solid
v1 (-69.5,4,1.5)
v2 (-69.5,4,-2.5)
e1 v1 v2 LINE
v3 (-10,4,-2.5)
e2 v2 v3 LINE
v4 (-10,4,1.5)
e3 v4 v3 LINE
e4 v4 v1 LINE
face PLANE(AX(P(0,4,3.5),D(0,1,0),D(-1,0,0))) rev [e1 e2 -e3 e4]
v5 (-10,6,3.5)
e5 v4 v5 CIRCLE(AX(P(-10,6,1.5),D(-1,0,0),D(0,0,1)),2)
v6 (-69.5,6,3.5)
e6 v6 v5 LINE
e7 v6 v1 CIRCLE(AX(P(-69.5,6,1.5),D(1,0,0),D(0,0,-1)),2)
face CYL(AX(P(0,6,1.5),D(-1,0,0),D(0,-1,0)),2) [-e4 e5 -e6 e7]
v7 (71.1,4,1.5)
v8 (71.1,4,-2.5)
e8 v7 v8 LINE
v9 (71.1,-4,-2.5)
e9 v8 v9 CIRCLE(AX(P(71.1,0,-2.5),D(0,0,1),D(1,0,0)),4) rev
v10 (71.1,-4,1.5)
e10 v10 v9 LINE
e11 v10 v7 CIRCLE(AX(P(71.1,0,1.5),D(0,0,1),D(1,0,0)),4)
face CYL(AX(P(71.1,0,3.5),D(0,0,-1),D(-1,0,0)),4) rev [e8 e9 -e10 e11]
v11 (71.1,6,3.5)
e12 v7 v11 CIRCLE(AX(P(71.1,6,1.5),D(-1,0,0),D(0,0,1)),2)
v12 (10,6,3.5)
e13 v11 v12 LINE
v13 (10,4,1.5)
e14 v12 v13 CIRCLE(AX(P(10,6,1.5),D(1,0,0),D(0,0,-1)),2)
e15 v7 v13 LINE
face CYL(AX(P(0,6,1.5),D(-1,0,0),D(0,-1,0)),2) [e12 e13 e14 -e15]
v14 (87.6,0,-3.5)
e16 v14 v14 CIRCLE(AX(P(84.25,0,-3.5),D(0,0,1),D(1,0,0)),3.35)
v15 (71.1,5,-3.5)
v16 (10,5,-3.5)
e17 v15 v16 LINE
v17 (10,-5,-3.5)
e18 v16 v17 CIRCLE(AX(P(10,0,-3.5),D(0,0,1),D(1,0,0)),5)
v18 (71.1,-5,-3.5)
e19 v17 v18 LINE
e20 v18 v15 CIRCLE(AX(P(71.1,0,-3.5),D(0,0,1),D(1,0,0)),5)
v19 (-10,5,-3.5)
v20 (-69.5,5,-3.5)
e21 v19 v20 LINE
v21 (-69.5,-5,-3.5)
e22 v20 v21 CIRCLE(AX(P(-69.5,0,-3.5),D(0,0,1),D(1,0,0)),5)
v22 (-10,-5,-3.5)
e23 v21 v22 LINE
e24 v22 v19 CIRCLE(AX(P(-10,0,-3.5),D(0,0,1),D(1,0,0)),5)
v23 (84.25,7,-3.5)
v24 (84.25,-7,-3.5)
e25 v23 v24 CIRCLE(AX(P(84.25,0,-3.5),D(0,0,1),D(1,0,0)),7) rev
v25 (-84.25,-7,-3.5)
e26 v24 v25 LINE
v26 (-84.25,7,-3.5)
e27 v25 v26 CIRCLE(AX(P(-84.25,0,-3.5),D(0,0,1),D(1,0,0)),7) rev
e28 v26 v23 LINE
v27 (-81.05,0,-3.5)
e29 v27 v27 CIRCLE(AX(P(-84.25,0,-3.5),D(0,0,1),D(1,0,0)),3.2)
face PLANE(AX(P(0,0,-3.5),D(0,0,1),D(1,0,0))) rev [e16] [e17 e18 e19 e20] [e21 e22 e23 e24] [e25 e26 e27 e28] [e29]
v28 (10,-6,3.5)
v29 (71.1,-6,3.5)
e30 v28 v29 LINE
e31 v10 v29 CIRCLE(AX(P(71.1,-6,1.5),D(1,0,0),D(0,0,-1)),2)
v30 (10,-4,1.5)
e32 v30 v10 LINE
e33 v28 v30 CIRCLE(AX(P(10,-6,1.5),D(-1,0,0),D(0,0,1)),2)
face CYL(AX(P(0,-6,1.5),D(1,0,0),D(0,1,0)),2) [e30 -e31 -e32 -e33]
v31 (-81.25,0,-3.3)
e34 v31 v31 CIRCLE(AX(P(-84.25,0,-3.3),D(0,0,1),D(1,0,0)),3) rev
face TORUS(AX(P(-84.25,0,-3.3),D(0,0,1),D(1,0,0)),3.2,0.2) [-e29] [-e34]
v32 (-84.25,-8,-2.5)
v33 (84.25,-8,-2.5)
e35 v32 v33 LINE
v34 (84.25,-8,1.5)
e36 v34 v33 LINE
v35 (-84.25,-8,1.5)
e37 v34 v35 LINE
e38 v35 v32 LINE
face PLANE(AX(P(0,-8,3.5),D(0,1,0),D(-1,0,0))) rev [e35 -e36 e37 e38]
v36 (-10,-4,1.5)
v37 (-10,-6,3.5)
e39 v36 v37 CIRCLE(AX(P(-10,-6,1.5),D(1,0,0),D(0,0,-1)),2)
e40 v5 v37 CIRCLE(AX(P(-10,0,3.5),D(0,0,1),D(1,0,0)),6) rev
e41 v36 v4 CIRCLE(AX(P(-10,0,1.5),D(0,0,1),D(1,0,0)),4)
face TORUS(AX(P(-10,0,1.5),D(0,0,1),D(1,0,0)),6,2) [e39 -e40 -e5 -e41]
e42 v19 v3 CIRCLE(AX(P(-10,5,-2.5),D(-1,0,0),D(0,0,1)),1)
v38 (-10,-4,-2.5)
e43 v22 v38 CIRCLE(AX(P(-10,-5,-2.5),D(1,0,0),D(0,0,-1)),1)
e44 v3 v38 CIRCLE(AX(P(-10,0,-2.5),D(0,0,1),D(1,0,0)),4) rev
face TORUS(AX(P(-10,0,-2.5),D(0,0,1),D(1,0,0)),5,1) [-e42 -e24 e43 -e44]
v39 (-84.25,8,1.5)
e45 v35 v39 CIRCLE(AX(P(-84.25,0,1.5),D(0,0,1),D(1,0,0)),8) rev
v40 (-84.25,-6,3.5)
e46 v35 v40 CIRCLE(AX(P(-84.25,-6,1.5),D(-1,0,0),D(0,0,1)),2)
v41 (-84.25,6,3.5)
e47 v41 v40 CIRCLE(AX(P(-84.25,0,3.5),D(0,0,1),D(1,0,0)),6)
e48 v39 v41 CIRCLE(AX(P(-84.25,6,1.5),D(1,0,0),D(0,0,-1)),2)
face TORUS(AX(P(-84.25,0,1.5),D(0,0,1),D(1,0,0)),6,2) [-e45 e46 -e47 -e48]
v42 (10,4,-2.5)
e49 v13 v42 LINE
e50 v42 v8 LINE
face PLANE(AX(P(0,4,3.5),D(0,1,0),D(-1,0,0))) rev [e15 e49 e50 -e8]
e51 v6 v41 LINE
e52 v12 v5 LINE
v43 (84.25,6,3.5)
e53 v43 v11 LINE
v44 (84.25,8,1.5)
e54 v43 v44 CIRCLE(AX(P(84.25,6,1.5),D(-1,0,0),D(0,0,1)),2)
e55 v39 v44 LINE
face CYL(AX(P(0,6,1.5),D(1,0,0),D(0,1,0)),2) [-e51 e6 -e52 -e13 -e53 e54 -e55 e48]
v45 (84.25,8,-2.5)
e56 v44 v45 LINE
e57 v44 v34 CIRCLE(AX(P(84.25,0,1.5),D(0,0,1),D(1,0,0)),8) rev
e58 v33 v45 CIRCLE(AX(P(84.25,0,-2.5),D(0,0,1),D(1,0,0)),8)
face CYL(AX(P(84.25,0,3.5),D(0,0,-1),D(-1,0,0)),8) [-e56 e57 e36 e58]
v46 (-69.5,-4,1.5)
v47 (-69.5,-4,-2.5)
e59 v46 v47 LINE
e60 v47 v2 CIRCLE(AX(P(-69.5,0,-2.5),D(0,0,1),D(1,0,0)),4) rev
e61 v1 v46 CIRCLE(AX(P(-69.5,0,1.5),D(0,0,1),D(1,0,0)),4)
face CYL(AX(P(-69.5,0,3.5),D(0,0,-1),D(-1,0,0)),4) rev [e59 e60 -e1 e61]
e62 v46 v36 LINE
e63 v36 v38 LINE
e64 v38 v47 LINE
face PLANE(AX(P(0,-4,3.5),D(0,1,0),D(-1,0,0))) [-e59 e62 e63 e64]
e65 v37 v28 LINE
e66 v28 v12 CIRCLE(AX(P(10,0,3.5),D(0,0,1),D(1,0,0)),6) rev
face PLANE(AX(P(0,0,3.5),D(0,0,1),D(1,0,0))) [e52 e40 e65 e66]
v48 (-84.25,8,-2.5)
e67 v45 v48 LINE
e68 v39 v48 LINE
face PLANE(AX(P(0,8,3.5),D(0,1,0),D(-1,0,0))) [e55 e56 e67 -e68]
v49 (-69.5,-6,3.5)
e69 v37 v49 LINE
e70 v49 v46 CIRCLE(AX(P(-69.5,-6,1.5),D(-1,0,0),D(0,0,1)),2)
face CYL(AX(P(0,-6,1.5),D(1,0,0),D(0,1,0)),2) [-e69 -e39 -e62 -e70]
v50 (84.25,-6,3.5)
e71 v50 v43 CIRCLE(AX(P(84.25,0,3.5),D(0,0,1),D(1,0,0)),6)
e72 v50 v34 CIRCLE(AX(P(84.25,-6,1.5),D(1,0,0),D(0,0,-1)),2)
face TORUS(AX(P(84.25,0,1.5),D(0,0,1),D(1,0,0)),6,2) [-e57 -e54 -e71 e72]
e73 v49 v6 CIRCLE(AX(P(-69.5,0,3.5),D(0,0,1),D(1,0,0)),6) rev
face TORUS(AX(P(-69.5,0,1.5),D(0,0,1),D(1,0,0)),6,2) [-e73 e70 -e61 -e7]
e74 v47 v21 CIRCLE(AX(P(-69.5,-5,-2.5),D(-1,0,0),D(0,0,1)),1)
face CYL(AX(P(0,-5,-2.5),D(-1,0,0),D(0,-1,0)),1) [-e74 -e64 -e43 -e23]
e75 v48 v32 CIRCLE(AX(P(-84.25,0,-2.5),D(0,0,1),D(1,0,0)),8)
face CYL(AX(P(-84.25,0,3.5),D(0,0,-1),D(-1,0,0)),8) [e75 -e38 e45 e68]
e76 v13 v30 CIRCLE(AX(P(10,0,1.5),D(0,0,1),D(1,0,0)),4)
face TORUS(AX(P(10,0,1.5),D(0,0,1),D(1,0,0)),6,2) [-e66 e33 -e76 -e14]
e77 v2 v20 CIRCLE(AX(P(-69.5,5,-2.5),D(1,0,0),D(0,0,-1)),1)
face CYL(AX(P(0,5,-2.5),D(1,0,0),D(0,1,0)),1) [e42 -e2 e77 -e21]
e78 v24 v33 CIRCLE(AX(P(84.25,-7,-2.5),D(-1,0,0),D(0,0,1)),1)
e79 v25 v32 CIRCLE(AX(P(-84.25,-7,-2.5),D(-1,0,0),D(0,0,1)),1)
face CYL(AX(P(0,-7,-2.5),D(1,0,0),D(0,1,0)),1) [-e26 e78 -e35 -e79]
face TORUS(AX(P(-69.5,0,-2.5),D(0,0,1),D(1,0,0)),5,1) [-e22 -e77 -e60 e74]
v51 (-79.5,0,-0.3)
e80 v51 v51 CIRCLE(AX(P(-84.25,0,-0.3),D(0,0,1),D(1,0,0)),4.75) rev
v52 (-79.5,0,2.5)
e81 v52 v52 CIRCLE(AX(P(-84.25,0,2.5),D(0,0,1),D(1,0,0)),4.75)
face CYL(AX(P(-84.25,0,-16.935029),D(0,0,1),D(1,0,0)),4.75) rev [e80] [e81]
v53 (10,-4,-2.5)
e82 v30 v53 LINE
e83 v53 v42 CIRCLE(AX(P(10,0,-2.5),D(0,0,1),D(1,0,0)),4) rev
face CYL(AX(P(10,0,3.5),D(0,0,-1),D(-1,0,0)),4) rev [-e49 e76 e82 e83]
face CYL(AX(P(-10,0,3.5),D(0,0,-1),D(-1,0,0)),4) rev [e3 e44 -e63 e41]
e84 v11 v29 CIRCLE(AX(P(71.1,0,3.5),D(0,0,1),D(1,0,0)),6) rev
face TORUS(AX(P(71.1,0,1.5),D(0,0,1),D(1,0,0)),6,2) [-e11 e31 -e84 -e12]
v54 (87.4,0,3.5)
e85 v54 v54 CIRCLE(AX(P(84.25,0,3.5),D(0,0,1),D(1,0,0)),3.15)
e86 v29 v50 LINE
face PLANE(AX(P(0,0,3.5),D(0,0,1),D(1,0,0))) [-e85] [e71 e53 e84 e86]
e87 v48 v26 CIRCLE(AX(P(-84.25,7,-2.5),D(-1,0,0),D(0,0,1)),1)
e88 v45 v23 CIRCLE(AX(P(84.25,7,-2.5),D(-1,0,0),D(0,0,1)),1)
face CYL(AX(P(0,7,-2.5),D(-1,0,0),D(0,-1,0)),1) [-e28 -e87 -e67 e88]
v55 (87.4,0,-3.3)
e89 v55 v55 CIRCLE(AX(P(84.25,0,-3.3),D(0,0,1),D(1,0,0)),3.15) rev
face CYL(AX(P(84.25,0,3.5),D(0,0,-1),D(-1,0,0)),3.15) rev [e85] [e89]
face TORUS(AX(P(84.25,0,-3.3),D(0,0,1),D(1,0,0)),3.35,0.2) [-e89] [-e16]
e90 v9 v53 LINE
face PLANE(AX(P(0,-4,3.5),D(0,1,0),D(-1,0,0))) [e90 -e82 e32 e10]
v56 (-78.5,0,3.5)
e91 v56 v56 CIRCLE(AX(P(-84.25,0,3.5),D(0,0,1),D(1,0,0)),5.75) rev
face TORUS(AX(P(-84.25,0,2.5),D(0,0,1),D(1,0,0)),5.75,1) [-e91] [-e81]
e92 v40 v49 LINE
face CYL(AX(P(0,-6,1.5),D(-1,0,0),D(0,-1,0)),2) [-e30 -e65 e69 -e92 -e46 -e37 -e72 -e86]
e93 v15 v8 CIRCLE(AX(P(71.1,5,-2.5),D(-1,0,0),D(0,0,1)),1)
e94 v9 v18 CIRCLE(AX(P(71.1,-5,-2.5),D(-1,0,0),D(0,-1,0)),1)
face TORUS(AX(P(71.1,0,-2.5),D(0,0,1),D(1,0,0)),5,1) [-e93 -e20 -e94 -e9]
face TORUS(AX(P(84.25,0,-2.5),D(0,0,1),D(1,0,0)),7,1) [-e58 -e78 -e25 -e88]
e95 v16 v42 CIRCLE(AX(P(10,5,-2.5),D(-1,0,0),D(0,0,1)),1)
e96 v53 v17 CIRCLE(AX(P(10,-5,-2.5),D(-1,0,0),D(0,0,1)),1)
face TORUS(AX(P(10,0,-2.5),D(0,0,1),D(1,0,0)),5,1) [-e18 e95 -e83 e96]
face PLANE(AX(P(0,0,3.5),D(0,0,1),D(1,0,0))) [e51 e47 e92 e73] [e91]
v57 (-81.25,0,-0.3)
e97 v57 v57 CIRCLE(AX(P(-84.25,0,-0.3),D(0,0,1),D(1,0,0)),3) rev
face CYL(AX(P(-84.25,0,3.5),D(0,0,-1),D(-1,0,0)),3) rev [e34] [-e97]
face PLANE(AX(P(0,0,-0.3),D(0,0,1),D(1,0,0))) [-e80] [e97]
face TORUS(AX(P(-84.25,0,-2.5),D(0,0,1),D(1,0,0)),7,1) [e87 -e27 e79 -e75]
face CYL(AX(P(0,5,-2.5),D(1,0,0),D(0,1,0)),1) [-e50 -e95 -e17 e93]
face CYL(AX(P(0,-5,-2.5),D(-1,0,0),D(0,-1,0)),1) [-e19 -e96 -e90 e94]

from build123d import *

# Parameters (mm, degrees)
SKETCH1_R           = 3.15
SKETCH1_R_2         = 3
BOSS_EXTRUDE1_DEPTH = 3.5
CUT_EXTRUDE1_START  = -0.3
SKETCH1_3_R         = 4.75
SKETCH1_3_R_2       = 3
CUT_EXTRUDE1_DEPTH  = 3.8
FILLET1_R           = 2
FILLET2_R           = 1
FILLET3_R           = 1
FILLET4_R           = 0.2


with BuildPart() as part:
    # Sketch1 → Boss-Extrude1 (new, symmetric)
    with BuildSketch(Plane.XY):
        with BuildLine():
            Line((-84.25, -8), (84.25, -8))
            ThreePointArc((84.25, -8), (92.25, 0), (84.25, 8))
            Line((84.25, 8), (-84.25, 8))
            ThreePointArc((-84.25, 8), (-92.25, 0), (-84.25, -8))
        make_face()
        with Locations((84.25, 0)):
            Circle(SKETCH1_R, mode=Mode.SUBTRACT)
        with Locations((-84.25, 0)):
            Circle(SKETCH1_R_2, mode=Mode.SUBTRACT)
        with BuildLine():
            Line((-69.5, 4), (-10, 4))
            ThreePointArc((-10, 4), (-6, 0), (-10, -4))
            Line((-10, -4), (-69.5, -4))
            ThreePointArc((-69.5, -4), (-73.5, 0), (-69.5, 4))
        make_face(mode=Mode.SUBTRACT)
        with BuildLine():
            Line((10, 4), (71.1, 4))
            ThreePointArc((71.1, 4), (75.1, 0), (71.1, -4))
            Line((71.1, -4), (10, -4))
            ThreePointArc((10, -4), (6, 0), (10, 4))
        make_face(mode=Mode.SUBTRACT)
    extrude(amount=BOSS_EXTRUDE1_DEPTH, both=True)

    # Sketch1<3> → Cut-Extrude1 (cut)
    with BuildSketch(Plane.XY.offset(CUT_EXTRUDE1_START)):
        with Locations((-84.25, 0)):
            Circle(SKETCH1_3_R)
        with Locations((-84.25, 0)):
            Circle(SKETCH1_3_R_2, mode=Mode.SUBTRACT)
    extrude(amount=CUT_EXTRUDE1_DEPTH, mode=Mode.SUBTRACT)

    # Fillet1
    fillet1_edges = [part.edges().sort_by_distance(p)[0] for p in [
        (40.55, -4, 3.5),
        (6, 0, 3.5),
        (40.55, 4, 3.5),
        (-6, 0, 3.5),
        (-39.75, -4, 3.5),
        (-73.5, 0, 3.5),
        (-39.75, 4, 3.5),
        (0, 8, 3.5),
        (-92.25, 0, 3.5),
        (0, -8, 3.5),
        (92.25, 0, 3.5),
        (75.1, 0, 3.5),
    ]]
    fillet(fillet1_edges, radius=FILLET1_R - 0.0001)  # a hair under: the kernel refuses the full size

    # Fillet2
    fillet2_edges = [part.edges().sort_by_distance(p)[0] for p in [
        (-89, 0, 3.5),
    ]]
    fillet(fillet2_edges, radius=FILLET2_R)

    # Fillet3
    fillet3_edges = [part.edges().sort_by_distance(p)[0] for p in [
        (92.25, 0, -3.5),
        (0, -8, -3.5),
        (-92.25, 0, -3.5),
        (0, 8, -3.5),
        (-39.75, 4, -3.5),
        (-73.5, 0, -3.5),
        (-39.75, -4, -3.5),
        (-6, 0, -3.5),
        (40.55, 4, -3.5),
        (6, 0, -3.5),
        (40.55, -4, -3.5),
        (75.1, 0, -3.5),
    ]]
    fillet(fillet3_edges, radius=FILLET3_R)

    # Fillet4
    fillet4_edges = [part.edges().sort_by_distance(p)[0] for p in [
        (-87.25, 0, -3.5),
        (81.1, 0, -3.5),
    ]]
    fillet(fillet4_edges, radius=FILLET4_R)


solid = part.part
